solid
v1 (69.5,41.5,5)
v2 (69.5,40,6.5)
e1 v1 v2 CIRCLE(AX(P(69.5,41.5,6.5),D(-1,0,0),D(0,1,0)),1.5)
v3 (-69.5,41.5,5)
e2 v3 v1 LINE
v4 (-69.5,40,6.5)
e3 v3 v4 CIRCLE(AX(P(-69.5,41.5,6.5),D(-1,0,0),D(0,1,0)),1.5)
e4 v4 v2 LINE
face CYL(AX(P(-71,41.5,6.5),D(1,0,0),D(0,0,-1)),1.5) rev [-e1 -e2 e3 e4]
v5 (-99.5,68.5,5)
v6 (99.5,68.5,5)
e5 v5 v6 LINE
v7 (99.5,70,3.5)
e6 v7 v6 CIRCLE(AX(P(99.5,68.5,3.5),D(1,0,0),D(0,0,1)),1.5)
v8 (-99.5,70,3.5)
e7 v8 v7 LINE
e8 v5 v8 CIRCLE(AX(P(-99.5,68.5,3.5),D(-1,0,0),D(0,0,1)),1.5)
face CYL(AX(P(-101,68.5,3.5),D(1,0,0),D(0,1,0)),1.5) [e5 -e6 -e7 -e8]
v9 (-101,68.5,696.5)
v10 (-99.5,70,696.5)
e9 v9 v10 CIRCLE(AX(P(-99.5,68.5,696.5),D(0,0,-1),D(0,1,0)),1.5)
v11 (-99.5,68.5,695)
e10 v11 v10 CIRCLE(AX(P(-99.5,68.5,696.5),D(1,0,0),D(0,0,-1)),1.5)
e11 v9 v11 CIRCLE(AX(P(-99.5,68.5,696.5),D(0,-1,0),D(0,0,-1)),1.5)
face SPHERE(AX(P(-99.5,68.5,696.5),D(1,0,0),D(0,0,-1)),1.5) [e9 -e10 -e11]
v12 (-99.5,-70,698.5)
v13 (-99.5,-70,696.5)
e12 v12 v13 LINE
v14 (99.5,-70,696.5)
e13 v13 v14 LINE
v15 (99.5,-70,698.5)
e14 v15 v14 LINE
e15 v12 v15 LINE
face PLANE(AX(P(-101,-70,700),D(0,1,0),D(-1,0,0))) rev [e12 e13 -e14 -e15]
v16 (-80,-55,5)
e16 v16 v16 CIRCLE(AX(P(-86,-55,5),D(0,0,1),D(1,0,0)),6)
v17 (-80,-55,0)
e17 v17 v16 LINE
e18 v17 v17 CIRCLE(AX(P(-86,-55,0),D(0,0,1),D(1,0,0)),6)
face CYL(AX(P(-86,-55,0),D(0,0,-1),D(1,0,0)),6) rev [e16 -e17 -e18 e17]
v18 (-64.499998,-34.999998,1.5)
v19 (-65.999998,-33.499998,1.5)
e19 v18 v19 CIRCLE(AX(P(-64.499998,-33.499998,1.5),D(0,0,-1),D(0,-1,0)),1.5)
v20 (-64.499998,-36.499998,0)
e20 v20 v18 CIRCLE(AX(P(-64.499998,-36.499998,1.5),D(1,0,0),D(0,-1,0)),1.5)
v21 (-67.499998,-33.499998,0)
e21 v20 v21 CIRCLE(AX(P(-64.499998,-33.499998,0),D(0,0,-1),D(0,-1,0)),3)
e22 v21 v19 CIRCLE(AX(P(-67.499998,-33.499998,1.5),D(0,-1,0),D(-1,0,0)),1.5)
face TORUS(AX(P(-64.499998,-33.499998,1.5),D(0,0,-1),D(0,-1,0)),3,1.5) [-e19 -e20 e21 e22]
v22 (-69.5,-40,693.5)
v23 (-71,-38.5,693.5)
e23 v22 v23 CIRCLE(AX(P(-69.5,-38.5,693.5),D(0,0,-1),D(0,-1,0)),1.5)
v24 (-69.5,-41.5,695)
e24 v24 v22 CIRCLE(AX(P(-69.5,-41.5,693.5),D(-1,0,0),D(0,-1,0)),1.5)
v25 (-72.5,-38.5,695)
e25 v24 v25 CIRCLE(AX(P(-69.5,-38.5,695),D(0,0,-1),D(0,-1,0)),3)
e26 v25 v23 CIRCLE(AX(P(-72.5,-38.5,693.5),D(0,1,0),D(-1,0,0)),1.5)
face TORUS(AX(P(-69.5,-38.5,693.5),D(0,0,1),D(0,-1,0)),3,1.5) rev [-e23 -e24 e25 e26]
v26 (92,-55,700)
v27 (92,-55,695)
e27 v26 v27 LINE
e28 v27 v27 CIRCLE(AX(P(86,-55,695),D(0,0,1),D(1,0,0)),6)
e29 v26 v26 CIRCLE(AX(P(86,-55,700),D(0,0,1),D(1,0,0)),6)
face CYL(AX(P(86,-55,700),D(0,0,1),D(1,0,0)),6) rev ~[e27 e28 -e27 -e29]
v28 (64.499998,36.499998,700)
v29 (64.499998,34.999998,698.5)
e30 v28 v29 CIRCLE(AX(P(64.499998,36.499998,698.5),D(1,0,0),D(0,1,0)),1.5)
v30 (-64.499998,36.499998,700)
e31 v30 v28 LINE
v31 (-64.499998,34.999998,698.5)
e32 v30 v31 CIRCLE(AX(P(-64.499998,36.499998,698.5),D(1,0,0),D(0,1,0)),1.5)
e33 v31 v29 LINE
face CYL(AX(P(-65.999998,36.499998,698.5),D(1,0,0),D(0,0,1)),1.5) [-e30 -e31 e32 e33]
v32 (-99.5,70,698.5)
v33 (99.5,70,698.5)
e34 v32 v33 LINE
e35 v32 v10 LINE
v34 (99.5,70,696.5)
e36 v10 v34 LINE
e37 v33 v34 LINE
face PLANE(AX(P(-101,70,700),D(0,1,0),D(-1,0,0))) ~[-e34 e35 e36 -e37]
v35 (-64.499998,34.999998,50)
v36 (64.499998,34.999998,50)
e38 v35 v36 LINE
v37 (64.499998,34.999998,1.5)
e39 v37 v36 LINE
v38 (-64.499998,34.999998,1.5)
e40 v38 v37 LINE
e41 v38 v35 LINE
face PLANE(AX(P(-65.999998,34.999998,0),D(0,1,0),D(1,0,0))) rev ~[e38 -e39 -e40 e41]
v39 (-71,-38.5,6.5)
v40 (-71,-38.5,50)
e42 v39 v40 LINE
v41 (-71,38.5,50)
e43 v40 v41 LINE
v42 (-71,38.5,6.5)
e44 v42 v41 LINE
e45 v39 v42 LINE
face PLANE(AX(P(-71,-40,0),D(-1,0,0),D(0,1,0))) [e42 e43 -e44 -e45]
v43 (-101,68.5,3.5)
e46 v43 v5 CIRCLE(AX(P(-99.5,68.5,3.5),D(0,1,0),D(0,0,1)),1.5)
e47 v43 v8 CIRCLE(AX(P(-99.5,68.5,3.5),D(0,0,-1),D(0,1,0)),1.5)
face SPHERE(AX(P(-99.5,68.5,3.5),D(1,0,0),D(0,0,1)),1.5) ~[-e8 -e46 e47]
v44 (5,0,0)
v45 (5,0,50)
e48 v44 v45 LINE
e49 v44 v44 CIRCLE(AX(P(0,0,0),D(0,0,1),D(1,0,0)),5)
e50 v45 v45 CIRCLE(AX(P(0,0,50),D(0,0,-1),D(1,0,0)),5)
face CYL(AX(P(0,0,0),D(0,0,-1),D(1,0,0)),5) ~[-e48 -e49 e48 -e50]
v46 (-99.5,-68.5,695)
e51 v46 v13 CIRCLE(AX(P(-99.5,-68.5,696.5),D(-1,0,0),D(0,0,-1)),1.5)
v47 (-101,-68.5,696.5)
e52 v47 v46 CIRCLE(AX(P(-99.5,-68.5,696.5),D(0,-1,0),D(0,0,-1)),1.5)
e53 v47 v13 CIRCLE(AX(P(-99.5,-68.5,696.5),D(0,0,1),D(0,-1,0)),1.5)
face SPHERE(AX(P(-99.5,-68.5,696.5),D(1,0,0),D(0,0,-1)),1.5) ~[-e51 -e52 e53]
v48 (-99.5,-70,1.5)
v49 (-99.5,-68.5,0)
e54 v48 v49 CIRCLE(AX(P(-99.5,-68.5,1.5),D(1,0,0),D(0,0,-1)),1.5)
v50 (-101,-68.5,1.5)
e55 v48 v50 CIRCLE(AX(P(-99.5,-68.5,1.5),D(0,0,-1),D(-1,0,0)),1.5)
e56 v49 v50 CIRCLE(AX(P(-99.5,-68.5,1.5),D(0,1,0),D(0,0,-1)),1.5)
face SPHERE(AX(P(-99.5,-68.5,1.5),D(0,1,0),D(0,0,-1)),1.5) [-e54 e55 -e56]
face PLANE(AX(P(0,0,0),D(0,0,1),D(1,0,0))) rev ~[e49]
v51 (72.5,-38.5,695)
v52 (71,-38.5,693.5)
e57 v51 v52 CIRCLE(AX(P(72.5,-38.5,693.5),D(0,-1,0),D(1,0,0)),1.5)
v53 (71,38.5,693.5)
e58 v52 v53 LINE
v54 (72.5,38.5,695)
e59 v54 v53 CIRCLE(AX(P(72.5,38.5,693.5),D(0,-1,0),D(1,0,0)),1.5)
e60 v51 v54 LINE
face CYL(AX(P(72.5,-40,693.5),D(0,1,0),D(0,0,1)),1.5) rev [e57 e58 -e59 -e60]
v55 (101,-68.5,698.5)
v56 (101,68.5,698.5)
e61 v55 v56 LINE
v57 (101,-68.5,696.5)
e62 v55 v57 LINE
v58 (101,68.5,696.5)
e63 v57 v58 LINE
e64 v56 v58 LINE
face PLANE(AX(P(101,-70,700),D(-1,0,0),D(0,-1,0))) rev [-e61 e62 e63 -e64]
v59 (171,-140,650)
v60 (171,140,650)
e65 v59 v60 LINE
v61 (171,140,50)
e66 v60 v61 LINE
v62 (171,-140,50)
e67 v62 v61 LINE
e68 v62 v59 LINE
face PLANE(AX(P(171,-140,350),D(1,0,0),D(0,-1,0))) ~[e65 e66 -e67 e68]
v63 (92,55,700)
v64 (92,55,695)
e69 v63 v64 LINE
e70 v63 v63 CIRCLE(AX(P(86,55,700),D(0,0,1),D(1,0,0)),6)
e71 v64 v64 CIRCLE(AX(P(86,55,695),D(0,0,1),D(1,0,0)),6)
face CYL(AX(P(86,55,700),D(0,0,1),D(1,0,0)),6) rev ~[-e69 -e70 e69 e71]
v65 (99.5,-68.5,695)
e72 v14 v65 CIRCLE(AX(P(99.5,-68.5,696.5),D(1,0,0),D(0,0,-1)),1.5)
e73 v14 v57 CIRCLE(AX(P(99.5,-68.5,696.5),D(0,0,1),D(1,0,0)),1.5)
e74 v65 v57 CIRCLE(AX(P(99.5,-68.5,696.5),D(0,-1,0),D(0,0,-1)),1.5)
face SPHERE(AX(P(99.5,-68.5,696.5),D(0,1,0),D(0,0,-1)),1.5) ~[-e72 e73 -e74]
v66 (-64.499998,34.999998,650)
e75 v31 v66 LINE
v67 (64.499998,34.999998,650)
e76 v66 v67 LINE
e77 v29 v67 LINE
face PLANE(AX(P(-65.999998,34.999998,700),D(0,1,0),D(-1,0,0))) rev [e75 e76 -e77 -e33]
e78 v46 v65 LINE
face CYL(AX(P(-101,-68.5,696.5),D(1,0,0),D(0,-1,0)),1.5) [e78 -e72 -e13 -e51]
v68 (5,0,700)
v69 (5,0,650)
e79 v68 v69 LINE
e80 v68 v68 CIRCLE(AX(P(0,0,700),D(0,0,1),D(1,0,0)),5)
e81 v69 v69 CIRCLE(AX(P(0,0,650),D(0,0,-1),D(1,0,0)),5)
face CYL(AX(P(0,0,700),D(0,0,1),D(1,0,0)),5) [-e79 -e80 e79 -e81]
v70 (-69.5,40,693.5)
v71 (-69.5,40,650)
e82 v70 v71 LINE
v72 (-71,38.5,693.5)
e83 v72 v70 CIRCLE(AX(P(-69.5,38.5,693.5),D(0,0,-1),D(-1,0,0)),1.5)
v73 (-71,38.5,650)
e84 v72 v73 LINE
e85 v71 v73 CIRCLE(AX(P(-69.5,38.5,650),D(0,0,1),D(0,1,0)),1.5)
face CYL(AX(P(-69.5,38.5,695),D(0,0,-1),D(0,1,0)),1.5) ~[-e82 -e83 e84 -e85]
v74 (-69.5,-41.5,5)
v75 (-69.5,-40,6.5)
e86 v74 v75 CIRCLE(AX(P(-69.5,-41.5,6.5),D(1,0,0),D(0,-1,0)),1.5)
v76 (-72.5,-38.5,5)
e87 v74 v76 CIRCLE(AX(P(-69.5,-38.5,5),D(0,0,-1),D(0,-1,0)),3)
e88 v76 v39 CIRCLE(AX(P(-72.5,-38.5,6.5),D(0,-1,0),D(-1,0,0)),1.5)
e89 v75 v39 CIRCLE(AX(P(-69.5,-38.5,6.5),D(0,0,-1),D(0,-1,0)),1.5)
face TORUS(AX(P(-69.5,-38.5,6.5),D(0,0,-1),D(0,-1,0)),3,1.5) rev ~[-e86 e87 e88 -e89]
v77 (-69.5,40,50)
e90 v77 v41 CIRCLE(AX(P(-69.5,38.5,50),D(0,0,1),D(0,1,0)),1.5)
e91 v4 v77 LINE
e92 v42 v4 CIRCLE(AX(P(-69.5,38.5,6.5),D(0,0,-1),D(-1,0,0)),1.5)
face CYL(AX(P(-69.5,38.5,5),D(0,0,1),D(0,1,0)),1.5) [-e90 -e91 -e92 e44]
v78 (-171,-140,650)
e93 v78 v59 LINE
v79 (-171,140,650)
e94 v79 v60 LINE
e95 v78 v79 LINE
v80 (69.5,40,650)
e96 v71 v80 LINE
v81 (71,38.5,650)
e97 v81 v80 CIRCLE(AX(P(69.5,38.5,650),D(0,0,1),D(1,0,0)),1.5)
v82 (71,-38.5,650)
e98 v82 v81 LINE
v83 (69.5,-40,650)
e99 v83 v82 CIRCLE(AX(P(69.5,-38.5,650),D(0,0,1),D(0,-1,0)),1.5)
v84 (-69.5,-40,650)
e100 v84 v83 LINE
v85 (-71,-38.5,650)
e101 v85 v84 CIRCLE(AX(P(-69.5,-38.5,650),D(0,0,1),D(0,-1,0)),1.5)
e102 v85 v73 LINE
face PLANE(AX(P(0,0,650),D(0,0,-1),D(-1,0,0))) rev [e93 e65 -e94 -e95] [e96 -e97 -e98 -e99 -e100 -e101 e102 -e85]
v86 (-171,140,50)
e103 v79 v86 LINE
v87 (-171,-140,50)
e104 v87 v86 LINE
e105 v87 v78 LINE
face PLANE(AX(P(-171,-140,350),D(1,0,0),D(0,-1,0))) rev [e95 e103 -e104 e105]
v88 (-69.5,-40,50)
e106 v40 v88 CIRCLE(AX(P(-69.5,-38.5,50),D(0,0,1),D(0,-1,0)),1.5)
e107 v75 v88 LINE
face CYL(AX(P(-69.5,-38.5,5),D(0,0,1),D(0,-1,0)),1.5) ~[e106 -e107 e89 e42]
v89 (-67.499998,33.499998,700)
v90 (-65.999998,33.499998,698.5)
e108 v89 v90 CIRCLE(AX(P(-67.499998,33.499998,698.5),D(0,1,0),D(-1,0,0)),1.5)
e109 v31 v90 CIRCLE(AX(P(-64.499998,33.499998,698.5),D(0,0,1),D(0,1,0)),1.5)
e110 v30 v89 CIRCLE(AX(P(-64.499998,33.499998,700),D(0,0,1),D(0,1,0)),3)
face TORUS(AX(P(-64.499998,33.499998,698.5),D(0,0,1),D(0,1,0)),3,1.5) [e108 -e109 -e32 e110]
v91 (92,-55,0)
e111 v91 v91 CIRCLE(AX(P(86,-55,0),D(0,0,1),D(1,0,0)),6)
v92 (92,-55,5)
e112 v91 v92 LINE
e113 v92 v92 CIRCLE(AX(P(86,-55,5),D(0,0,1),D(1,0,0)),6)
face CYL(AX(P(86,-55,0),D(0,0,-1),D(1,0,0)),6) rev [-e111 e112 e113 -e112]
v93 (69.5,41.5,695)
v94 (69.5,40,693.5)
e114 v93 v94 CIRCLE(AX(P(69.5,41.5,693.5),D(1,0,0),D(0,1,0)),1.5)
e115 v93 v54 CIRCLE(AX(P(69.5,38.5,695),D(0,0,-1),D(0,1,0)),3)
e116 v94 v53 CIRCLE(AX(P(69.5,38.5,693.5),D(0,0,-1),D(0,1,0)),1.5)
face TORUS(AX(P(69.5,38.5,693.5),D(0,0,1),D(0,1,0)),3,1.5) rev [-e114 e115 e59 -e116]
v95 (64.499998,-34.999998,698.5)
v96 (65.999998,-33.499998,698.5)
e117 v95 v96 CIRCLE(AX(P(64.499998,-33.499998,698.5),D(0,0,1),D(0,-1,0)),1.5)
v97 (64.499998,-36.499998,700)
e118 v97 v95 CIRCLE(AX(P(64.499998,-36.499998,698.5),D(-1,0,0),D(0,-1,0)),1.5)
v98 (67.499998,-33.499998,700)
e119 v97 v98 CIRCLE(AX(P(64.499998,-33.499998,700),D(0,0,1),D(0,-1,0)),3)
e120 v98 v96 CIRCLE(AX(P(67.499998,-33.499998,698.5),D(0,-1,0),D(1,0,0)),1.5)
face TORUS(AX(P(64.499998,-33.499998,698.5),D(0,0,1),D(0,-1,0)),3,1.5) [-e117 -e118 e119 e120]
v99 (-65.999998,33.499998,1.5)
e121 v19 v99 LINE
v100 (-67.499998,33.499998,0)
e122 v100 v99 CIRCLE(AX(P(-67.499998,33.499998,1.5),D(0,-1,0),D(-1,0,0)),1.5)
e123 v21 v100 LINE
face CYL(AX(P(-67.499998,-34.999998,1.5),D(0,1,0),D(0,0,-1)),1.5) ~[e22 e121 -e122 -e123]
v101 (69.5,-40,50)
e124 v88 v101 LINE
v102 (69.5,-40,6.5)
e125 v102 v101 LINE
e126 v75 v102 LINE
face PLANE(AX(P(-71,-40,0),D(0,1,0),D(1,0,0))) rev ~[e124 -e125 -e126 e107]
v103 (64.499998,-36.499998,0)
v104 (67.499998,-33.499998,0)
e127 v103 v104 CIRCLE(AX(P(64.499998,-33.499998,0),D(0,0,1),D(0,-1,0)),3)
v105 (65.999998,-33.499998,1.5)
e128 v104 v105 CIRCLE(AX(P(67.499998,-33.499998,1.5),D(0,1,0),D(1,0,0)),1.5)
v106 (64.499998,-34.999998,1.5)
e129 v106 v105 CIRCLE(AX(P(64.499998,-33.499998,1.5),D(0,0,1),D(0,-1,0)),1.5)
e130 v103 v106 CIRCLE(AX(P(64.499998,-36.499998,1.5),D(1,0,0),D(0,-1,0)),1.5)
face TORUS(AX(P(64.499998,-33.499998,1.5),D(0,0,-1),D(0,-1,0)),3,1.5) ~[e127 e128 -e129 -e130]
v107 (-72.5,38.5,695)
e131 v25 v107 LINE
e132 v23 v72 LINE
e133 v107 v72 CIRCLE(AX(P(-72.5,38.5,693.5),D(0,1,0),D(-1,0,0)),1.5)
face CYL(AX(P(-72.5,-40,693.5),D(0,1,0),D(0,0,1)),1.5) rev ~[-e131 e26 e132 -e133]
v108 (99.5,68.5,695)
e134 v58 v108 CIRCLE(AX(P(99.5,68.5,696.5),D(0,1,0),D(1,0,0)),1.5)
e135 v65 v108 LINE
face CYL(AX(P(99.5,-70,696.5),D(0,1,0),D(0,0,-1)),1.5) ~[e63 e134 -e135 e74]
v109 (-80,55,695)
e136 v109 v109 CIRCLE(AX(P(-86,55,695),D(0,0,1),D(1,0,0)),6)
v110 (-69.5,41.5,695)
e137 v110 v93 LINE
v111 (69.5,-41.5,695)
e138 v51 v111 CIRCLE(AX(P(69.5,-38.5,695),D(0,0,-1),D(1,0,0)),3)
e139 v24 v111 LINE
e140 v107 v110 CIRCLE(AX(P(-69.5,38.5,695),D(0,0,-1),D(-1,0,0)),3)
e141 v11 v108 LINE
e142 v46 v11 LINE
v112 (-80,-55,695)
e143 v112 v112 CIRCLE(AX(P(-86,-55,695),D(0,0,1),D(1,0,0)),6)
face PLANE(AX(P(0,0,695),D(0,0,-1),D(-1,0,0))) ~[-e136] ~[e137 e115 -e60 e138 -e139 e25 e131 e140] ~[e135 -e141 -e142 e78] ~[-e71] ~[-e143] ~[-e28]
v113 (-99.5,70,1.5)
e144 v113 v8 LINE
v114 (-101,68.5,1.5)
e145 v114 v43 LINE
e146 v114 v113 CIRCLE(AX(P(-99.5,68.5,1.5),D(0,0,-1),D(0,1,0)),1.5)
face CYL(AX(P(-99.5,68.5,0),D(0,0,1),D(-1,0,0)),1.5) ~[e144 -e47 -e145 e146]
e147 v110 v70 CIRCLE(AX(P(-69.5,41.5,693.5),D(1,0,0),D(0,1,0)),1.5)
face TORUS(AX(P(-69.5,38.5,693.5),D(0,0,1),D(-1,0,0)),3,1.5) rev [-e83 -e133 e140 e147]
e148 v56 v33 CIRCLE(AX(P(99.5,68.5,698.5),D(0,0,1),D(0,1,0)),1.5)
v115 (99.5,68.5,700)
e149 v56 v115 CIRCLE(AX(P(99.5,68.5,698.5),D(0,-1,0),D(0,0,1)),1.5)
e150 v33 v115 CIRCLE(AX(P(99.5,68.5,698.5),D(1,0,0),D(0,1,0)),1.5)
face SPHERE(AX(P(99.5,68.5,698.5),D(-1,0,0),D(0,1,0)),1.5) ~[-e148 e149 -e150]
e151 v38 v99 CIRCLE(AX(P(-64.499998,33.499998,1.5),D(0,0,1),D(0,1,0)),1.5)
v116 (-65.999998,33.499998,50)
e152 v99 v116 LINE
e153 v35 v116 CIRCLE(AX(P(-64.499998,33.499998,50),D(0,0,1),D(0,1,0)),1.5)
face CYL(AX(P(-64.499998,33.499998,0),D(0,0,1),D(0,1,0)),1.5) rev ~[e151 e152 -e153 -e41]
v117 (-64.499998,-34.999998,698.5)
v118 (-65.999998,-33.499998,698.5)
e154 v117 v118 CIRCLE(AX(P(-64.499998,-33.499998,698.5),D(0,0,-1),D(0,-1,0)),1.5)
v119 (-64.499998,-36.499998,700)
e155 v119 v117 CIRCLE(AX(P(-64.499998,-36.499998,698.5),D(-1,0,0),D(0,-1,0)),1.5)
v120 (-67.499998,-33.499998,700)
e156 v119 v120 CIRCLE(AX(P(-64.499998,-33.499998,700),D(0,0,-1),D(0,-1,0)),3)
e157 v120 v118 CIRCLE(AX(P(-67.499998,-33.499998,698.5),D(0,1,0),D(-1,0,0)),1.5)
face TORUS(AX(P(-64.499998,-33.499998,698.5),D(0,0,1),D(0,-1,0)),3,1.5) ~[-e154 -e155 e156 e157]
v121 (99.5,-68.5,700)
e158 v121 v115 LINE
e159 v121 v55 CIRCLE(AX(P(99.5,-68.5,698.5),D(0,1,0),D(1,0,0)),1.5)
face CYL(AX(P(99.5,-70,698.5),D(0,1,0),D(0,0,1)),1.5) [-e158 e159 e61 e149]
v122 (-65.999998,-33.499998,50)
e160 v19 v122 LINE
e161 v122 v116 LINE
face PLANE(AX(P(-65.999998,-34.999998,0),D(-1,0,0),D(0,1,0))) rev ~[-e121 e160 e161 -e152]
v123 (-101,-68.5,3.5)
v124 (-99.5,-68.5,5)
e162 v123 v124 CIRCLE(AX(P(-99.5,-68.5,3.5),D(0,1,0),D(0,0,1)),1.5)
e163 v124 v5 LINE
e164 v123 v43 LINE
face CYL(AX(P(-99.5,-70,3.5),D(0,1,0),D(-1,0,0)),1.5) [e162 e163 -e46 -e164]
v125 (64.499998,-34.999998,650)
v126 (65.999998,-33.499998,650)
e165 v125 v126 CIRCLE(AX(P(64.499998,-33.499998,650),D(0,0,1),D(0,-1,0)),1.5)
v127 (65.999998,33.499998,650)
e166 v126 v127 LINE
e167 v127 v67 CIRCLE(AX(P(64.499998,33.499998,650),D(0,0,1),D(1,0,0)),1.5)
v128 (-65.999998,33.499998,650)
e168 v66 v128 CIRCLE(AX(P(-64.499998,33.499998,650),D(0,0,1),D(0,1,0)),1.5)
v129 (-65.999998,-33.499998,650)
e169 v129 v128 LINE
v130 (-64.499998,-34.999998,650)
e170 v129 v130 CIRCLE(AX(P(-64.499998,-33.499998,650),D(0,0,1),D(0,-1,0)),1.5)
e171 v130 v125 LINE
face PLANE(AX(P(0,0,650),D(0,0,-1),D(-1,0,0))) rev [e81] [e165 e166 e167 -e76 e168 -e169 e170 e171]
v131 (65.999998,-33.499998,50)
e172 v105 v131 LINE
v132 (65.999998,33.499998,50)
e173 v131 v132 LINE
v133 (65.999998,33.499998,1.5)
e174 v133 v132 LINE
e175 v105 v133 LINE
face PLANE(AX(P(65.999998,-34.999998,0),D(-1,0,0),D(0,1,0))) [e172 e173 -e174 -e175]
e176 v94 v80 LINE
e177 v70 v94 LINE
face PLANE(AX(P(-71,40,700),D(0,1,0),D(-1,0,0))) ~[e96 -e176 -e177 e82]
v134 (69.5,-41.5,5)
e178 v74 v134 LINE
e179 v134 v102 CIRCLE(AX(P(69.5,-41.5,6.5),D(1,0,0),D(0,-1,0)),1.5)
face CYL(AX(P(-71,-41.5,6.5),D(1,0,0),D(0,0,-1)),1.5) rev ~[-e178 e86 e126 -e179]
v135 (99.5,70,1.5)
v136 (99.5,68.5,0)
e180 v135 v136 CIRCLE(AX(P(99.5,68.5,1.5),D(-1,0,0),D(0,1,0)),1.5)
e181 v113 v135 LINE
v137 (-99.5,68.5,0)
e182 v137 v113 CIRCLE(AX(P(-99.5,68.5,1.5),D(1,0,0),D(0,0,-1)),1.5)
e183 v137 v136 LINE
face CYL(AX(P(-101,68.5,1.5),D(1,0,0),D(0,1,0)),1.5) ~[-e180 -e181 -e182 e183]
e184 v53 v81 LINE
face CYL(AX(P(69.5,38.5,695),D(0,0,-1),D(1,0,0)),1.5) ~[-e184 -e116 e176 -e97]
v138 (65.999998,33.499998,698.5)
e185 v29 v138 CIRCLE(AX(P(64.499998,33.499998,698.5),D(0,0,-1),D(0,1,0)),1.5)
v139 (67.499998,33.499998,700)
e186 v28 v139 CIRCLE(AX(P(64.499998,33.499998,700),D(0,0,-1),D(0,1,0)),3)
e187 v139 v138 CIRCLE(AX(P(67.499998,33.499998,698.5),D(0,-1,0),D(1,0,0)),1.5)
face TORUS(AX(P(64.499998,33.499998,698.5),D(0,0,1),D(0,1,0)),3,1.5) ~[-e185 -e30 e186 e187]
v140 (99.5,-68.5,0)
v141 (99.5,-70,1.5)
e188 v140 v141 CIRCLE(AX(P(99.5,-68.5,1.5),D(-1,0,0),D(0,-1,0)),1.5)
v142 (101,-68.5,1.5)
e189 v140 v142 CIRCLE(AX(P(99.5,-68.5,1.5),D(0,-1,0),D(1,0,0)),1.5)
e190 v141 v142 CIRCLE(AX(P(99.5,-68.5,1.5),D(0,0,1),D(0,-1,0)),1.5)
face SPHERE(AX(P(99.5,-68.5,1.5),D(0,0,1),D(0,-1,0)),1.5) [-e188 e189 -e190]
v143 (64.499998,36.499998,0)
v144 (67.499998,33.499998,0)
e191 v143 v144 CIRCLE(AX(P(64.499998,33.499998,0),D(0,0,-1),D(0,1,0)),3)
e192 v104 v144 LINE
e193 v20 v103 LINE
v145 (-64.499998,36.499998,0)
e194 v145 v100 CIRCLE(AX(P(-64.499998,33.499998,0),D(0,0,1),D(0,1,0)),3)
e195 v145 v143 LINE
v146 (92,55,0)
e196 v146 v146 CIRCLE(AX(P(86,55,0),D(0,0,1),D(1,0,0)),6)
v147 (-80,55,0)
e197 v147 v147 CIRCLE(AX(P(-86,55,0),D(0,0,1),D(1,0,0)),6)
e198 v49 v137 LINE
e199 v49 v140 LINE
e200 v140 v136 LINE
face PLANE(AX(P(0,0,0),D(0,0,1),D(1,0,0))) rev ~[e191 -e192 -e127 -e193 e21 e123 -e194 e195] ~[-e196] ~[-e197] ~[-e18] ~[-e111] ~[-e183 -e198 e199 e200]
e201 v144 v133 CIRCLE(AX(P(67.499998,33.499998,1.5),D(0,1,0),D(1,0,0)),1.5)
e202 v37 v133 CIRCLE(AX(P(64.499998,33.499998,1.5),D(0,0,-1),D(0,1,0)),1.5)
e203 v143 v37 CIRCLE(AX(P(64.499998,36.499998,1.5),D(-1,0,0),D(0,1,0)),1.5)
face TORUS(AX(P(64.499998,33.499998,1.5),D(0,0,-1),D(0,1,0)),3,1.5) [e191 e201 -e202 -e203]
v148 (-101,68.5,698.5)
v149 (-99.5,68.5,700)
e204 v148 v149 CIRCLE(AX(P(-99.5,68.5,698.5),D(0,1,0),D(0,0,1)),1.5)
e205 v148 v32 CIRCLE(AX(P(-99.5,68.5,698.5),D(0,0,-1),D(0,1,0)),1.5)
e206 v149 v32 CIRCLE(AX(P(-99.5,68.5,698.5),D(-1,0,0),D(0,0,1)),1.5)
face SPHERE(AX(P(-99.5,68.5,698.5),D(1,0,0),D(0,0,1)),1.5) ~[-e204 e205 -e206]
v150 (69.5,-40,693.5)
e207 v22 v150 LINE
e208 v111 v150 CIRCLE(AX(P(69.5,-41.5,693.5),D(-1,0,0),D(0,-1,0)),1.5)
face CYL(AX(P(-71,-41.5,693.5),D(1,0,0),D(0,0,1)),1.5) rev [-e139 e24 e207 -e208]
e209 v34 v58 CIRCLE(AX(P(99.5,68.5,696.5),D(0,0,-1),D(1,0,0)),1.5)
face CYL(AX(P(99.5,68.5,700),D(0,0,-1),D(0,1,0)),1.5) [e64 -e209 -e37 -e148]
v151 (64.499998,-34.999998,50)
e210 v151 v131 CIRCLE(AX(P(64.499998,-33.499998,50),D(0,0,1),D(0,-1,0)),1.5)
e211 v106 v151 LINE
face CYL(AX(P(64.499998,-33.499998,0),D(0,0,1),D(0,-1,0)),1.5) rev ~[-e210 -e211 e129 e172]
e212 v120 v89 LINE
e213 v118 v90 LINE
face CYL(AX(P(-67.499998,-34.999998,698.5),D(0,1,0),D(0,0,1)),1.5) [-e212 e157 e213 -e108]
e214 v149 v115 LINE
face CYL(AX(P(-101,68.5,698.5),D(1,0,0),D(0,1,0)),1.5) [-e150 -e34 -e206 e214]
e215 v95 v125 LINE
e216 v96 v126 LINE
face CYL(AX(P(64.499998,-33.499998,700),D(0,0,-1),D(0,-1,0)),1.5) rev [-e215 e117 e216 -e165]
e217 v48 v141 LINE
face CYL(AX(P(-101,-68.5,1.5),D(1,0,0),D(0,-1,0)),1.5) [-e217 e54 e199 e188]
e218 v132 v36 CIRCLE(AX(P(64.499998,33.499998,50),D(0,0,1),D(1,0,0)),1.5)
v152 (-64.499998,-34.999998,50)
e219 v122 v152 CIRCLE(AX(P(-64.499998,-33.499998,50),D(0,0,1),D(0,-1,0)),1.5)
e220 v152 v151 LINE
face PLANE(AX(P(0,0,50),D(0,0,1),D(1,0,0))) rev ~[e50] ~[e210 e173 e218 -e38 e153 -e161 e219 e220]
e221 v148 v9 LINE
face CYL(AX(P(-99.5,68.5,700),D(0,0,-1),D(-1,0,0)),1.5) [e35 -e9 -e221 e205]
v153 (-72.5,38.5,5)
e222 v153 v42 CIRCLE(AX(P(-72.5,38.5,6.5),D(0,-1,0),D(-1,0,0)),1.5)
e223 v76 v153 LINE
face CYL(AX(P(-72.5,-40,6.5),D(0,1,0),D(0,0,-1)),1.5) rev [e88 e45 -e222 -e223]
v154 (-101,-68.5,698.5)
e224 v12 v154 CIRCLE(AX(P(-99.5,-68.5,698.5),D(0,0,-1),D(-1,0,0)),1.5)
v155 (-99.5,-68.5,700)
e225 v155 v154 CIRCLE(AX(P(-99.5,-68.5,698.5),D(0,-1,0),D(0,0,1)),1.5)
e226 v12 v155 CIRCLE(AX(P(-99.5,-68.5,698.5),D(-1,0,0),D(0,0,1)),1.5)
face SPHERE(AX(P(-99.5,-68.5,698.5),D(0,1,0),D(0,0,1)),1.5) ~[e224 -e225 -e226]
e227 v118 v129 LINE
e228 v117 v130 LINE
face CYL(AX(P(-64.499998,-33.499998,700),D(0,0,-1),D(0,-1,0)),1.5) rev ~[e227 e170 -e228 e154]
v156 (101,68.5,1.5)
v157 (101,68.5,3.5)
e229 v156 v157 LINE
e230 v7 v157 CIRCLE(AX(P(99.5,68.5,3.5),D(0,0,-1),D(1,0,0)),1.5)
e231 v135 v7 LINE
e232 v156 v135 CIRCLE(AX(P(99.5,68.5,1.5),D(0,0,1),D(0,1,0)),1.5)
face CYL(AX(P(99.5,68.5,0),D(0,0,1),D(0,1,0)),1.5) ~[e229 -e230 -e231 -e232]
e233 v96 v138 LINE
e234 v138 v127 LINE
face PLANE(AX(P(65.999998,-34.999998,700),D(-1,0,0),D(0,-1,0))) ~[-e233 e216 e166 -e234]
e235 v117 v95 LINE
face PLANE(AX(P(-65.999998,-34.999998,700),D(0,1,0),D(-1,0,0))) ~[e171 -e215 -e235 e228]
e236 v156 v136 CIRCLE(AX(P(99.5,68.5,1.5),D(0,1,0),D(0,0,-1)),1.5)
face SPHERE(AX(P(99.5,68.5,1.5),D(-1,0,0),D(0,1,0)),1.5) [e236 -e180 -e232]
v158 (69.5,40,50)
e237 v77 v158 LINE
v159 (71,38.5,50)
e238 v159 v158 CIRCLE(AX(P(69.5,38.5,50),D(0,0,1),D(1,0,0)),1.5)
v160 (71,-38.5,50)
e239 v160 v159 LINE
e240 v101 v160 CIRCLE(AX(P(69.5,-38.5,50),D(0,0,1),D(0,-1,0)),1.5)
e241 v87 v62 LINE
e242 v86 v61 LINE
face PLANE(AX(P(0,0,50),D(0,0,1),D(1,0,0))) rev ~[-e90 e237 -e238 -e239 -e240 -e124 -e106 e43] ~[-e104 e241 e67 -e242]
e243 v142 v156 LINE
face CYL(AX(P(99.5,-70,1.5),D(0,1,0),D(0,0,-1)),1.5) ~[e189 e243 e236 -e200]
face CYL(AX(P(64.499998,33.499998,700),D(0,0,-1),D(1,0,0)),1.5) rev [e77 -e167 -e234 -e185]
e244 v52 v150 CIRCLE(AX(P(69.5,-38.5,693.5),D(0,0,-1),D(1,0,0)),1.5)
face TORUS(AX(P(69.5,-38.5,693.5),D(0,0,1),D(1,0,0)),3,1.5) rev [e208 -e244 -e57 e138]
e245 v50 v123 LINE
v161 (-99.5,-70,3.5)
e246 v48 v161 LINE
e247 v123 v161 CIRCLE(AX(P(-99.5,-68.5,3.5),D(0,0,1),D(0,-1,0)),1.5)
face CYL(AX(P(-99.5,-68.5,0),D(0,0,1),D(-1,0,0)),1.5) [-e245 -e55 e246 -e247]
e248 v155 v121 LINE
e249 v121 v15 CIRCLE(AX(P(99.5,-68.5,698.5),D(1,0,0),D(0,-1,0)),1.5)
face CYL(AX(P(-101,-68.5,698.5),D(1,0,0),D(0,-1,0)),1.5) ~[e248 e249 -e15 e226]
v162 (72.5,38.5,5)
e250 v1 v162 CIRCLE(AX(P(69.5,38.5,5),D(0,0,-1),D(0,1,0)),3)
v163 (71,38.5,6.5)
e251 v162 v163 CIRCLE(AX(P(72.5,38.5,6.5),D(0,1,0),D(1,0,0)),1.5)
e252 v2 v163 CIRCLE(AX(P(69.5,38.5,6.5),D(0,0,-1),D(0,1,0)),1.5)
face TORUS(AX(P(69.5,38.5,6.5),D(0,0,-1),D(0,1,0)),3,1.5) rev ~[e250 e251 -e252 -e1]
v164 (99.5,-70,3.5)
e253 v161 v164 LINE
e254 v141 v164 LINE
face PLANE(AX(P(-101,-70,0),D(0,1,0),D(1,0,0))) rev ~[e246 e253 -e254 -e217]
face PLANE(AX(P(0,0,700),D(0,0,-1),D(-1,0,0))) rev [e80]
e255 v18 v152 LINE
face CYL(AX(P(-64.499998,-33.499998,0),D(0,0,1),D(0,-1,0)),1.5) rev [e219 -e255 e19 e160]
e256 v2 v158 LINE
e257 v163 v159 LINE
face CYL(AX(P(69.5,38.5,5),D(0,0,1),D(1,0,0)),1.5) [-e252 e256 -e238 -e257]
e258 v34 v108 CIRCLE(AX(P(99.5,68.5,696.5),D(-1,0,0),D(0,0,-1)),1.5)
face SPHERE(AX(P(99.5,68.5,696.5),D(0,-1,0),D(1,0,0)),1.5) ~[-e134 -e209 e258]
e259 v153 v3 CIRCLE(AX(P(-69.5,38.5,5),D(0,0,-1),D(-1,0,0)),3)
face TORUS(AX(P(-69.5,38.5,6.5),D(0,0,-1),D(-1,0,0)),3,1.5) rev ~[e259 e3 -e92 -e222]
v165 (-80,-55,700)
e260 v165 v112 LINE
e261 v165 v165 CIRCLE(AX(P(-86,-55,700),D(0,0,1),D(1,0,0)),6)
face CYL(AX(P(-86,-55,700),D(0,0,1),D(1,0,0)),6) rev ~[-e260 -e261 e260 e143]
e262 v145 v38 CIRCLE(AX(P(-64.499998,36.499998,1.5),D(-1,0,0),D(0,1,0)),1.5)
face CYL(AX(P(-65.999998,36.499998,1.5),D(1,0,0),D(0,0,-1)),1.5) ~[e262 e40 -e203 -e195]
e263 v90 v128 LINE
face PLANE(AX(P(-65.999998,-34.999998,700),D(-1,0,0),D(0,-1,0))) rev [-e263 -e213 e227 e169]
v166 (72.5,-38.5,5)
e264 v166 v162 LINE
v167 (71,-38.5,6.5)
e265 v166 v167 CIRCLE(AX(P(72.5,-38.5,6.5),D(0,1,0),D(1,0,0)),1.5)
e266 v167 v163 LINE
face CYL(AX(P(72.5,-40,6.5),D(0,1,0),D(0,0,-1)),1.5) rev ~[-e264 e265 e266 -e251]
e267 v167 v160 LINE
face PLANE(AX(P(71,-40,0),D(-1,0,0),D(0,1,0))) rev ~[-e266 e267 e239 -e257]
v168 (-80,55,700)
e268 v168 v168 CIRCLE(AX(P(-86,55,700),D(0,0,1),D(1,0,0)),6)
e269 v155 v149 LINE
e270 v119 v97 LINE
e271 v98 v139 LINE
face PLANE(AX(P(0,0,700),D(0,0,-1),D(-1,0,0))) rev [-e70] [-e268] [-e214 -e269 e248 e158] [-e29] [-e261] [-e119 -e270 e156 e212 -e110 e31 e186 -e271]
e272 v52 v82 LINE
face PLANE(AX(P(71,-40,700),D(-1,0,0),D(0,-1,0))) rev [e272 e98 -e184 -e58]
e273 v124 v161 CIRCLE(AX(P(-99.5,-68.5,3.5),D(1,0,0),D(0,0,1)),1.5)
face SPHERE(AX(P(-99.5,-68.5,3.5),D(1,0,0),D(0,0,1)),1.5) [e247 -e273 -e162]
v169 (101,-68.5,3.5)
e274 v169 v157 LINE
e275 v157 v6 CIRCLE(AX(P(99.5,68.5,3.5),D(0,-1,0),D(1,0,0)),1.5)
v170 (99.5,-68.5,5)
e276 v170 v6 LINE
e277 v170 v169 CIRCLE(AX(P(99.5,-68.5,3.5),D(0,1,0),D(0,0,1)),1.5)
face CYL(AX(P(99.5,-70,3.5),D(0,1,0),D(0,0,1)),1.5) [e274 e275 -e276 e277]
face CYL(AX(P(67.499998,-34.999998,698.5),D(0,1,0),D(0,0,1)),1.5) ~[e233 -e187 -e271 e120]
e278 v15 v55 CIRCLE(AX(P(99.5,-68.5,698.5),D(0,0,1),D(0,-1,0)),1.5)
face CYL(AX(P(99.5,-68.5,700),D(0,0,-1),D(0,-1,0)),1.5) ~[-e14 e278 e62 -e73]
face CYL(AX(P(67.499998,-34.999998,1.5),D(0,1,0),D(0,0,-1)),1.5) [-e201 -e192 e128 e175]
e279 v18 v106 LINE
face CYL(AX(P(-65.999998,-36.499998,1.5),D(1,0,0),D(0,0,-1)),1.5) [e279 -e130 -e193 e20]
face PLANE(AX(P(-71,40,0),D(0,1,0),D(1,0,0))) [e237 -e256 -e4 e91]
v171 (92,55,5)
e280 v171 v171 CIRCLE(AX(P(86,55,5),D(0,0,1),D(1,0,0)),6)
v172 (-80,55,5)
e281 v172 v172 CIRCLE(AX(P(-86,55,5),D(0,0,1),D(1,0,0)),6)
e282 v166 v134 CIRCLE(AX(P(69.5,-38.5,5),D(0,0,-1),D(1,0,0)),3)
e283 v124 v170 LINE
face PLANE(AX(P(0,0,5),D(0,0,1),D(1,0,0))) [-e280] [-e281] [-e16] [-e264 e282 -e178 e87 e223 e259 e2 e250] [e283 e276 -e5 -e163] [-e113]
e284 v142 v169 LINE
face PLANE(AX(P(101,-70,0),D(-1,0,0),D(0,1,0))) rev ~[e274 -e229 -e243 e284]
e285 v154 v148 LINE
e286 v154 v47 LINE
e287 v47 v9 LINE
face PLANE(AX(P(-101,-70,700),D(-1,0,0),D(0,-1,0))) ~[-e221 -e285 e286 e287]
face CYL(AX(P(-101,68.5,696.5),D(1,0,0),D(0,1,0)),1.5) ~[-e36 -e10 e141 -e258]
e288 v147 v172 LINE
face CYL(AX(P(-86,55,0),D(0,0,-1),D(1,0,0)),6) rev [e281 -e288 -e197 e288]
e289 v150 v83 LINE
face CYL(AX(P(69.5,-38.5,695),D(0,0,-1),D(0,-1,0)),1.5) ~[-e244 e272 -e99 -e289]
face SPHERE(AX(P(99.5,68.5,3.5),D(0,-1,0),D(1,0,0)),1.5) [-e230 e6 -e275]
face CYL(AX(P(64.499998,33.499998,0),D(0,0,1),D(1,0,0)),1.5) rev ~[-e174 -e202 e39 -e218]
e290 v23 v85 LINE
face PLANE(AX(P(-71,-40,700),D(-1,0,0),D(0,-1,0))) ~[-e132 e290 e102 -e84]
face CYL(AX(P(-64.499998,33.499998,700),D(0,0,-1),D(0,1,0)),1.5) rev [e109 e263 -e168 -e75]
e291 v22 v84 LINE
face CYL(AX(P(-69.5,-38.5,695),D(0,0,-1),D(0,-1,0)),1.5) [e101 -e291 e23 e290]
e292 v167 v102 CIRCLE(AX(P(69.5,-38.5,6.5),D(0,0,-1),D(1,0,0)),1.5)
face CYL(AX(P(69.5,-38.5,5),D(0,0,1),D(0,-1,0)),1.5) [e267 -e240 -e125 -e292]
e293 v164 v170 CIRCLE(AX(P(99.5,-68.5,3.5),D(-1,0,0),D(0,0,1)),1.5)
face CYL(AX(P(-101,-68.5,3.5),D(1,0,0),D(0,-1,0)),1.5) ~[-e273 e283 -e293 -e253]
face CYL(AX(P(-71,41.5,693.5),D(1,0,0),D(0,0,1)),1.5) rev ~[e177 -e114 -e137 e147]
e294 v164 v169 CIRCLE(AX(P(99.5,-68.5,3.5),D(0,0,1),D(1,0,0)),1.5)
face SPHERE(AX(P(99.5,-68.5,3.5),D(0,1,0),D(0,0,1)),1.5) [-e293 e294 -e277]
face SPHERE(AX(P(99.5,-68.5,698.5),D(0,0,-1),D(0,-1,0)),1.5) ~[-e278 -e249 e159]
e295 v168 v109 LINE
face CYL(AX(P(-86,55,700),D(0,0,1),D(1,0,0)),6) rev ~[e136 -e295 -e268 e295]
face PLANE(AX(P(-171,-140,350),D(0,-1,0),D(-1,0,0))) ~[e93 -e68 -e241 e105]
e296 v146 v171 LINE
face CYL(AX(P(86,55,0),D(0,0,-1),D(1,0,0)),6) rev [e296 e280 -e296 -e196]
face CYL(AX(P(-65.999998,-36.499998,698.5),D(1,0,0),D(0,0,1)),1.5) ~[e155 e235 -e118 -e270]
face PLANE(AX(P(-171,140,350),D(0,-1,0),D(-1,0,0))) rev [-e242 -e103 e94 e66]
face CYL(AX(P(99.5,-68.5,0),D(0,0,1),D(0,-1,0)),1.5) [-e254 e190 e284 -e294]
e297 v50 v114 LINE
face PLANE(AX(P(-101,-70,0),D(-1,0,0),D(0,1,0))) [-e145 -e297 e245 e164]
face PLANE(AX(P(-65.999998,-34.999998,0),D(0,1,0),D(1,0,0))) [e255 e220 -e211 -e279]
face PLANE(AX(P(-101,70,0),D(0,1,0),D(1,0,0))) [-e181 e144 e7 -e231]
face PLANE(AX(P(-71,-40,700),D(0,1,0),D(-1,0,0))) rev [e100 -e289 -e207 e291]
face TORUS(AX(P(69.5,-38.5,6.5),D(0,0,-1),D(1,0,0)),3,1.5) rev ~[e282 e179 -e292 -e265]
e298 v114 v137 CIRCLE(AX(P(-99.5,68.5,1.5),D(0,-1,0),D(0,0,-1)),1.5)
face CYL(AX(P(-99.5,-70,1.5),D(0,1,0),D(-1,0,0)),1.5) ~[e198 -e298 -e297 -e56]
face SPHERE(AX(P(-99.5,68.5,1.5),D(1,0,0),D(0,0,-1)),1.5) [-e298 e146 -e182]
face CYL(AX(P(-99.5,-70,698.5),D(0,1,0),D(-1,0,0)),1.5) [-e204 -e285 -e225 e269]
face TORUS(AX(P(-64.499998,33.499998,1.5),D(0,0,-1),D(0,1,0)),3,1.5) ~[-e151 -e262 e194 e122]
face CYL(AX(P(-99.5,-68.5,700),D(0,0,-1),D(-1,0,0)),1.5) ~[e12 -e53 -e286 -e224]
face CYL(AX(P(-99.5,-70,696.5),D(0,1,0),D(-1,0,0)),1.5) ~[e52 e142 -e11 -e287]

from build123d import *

# Parameters (mm, degrees)
F0_W     = 142
F0_H     = 80
F1_DEPTH = 350
F2_W     = 202
F2_H     = 140
F2_R     = 6
F2_W_2   = 131.9999952316
F2_H_2   = 69.9999952316
F3_DEPTH = 5
F2_R_2   = 5
F5_DEPTH = 700
F6_R     = 1.5
F7_W     = 342
F7_H     = 280
F8_DEPTH = 300


with BuildPart() as f1:
    # F0 (on Top) → F1 (new body)
    with BuildSketch(Plane.XY):
        Rectangle(F0_W, F0_H)
    extrude(amount=F1_DEPTH)

    # F2 (on Top) → F3 (join)
    with BuildSketch(Plane.XY):
        Rectangle(F2_W, F2_H)
        with Locations((-86, -55)):
            Circle(F2_R, mode=Mode.SUBTRACT)
        with Locations((86, -55)):
            Circle(F2_R, mode=Mode.SUBTRACT)
        with Locations((-86, 55)):
            Circle(F2_R, mode=Mode.SUBTRACT)
        Rectangle(F2_W_2, F2_H_2, mode=Mode.SUBTRACT)
        with Locations((86, 55)):
            Circle(F2_R, mode=Mode.SUBTRACT)
    extrude(amount=F3_DEPTH)

    # F4: union 

    # F2 (on Top) → F5 (cut)
    with BuildSketch(Plane.XY):
        Rectangle(F2_W_2, F2_H_2)
        Circle(F2_R_2, mode=Mode.SUBTRACT)
    extrude(amount=F5_DEPTH, mode=Mode.SUBTRACT)

    # F6
    f6_edges = [f1.edges().sort_by_distance(p)[0] for p in [
        (0, 40, 5),
        (101, 0, 5),
        (0, 70, 0),
        (65.999998, -34.999998, 175),
        (-101, 0, 0),
        (0, -70, 5),
        (101, 70, 2.5),
        (0, 70, 5),
        (71, -40, 177.5),
        (65.999998, 34.999998, 175),
        (71, 0, 5),
        (101, -70, 2.5),
        (0, -70, 0),
        (-101, 0, 5),
        (-71, 40, 177.5),
        (101, 0, 0),
        (71, 40, 177.5),
        (-65.999998, 34.999998, 175),
        (-65.999998, -34.999998, 175),
        (0, 34.999998, 0),
        (0, -34.999998, 0),
        (0, -40, 5),
        (-101, 70, 2.5),
        (-101, -70, 2.5),
        (-71, 0, 5),
        (-71, -40, 177.5),
        (65.999998, 0, 0),
        (-65.999998, 0, 0),
    ]]
    fillet(f6_edges, radius=F6_R)

    # F7 (on face) → F8 (join)
    with BuildSketch(Plane.XY.offset(350)):
        Rectangle(F7_W, F7_H)
    extrude(amount=-F8_DEPTH)

    # F9: F1 across face


with BuildPart() as f1_1:
    add(f1.part)
    add(f1.part.mirror(Plane.XY.offset(350)))


solid = f1_1.part
